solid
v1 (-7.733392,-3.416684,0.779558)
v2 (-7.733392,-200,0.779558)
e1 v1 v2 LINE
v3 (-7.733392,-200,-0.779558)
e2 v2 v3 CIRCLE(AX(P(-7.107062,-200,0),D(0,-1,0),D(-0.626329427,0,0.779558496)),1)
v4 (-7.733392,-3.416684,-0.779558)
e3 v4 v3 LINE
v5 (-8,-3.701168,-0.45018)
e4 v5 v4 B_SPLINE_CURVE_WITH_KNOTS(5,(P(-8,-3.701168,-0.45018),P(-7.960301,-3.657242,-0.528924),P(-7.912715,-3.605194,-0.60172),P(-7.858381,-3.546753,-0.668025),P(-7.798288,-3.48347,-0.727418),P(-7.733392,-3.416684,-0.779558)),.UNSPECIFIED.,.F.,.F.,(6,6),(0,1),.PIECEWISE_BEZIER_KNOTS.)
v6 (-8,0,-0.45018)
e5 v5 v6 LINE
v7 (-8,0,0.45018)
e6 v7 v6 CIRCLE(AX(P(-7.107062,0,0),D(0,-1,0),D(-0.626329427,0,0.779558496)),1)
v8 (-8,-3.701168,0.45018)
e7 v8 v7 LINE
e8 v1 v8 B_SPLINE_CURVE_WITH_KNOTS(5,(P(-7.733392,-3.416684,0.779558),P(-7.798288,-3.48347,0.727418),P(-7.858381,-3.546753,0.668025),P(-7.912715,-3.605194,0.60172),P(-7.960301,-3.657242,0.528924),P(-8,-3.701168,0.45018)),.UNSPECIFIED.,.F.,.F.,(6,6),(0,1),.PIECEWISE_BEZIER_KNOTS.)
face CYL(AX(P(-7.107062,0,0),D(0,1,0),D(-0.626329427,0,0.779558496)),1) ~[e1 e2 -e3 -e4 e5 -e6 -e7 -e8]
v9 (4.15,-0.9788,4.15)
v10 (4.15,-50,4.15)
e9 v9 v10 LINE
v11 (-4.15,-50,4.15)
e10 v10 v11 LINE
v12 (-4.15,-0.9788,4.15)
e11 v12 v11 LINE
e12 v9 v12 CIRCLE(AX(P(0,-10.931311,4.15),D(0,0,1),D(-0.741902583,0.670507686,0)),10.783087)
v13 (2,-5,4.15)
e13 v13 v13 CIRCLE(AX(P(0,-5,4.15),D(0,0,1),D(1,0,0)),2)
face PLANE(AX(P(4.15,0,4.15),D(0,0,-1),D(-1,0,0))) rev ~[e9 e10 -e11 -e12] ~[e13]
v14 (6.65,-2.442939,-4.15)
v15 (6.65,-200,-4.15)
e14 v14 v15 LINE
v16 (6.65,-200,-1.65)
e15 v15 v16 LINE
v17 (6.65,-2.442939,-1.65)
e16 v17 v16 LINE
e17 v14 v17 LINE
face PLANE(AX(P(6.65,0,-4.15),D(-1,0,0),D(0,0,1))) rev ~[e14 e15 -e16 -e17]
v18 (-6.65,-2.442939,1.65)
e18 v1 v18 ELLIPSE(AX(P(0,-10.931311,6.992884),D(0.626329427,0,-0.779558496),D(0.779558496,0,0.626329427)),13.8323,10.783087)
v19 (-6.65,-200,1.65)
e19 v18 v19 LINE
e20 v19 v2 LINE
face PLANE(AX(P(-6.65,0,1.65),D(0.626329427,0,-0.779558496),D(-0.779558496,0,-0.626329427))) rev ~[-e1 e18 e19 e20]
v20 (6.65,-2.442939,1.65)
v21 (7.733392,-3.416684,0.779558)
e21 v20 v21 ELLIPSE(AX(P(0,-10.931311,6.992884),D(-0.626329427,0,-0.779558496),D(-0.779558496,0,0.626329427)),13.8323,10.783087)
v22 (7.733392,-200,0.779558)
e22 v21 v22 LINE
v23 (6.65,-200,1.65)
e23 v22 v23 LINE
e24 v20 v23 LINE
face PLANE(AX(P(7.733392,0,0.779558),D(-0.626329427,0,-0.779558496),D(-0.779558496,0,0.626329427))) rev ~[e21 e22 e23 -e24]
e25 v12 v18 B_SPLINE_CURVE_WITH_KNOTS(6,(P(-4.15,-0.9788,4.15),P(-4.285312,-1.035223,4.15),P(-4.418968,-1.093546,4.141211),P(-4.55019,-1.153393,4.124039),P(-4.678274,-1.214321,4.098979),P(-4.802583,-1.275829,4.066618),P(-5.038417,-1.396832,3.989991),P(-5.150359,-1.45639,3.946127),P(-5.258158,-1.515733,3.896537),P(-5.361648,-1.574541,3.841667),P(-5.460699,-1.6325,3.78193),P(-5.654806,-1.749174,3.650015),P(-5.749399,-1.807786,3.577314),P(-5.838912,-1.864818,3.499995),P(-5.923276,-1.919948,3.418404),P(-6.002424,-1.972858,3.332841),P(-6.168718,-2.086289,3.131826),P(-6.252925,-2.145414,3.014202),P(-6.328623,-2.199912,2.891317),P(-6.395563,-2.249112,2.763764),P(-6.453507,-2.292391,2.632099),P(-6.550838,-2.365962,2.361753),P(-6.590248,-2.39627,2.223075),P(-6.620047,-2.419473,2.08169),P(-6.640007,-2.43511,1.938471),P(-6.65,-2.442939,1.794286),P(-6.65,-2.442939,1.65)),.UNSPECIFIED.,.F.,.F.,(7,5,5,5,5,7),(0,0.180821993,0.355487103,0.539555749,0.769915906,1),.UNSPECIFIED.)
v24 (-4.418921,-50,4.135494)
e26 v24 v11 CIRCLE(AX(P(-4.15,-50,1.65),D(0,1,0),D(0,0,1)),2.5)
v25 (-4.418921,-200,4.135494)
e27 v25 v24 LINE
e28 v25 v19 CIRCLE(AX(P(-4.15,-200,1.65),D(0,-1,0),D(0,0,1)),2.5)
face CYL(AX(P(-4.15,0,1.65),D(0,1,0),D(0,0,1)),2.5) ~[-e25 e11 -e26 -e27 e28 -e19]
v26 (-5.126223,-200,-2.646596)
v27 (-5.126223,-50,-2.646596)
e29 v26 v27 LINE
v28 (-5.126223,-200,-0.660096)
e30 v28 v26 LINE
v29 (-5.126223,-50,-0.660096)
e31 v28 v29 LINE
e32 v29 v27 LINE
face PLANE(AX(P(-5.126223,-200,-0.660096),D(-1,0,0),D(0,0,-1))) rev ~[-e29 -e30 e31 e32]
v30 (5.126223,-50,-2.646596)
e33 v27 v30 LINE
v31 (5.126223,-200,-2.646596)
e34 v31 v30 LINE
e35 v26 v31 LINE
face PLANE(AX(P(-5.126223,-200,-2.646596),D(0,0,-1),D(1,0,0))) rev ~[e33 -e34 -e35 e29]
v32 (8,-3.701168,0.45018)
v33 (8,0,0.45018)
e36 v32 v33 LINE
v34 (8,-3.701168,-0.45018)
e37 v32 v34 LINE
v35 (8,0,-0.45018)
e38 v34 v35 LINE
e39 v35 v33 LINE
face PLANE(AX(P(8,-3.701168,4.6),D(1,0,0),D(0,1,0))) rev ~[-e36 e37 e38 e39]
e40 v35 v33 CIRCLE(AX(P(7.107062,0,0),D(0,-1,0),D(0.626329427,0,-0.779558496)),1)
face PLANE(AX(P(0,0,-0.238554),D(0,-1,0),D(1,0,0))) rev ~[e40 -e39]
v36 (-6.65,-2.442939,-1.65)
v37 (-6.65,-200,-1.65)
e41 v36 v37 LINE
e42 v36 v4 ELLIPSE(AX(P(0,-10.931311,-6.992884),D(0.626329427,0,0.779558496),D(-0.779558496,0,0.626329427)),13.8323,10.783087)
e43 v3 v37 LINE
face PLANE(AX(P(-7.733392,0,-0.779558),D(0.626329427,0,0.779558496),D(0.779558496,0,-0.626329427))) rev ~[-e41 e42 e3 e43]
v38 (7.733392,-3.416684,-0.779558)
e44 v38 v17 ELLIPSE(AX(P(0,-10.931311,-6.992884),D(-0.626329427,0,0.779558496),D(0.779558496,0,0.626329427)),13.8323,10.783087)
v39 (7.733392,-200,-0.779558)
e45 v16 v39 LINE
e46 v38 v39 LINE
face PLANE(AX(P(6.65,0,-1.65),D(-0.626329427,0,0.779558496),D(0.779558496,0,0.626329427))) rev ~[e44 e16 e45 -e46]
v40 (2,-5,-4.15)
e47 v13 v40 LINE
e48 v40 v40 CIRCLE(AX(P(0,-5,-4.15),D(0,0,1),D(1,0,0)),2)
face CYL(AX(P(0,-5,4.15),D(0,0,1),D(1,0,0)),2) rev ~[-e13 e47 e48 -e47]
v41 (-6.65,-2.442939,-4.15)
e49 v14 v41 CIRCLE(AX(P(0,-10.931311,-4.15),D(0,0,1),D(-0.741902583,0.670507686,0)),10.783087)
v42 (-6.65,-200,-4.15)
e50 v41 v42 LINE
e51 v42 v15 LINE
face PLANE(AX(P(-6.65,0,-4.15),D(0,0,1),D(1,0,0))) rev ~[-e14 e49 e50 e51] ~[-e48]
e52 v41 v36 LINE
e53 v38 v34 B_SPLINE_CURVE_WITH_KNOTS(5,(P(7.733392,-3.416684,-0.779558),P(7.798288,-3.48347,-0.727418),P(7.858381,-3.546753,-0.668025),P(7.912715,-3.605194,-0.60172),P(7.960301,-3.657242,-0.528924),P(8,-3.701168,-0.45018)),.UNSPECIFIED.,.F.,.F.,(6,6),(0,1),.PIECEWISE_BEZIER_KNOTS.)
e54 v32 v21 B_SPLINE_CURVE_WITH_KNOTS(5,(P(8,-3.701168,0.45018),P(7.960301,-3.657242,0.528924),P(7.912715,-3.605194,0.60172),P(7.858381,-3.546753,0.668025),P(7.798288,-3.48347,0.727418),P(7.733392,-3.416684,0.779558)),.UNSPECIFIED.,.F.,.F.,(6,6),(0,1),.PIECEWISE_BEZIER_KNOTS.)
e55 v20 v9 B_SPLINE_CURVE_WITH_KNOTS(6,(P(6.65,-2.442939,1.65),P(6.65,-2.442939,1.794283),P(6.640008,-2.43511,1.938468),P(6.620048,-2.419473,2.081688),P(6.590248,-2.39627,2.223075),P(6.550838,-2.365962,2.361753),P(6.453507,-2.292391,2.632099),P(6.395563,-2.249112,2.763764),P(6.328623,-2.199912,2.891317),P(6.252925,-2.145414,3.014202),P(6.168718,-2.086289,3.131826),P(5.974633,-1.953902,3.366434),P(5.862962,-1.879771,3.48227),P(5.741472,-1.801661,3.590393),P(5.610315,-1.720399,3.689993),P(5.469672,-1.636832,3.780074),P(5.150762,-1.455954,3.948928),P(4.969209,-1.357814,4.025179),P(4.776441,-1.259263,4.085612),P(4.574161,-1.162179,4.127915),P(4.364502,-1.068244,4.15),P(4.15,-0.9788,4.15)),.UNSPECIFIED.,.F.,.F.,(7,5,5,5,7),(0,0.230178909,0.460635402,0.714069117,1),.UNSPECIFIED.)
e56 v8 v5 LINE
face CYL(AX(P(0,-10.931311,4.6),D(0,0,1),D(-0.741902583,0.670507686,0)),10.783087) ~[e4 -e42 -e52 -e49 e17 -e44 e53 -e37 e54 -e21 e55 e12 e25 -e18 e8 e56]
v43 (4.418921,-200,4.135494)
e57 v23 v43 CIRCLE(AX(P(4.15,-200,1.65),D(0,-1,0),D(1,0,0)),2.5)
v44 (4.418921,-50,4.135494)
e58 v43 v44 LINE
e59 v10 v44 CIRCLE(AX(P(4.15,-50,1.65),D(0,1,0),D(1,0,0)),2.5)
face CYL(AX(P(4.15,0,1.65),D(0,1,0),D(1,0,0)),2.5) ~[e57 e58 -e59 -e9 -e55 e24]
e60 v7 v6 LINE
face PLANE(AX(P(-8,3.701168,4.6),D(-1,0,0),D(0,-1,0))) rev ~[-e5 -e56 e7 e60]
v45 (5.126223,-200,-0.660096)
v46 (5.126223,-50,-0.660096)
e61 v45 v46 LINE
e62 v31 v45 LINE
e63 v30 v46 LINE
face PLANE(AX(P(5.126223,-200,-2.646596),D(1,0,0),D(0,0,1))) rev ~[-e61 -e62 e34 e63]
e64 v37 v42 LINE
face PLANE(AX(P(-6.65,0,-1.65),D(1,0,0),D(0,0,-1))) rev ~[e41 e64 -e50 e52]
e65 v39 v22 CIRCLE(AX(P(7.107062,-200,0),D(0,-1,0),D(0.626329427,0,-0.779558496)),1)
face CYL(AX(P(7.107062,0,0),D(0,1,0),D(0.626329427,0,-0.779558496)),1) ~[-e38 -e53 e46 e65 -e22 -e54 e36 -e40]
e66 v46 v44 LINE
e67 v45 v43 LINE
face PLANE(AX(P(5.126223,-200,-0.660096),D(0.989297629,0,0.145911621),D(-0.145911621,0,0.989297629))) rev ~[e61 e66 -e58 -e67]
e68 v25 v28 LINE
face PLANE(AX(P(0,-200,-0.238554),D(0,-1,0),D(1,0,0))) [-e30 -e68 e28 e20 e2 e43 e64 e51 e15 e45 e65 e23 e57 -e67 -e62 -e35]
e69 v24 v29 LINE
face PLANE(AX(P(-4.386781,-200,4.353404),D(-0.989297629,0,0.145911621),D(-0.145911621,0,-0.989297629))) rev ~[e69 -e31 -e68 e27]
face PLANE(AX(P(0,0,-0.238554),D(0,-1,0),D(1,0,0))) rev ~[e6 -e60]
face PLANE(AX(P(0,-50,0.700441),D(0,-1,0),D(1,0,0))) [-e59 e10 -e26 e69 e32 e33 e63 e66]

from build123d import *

# Parameters (mm, degrees)
F1_DEPTH = 200
F2_R     = 2
F3_DEPTH = 8.301
F6_DEPTH = 25
F9_DEPTH = 150


# Not quite as in the source:
# - a feature names something its author has since deleted; it is built from what else it names


with BuildPart() as f1:
    # F0 (on Front) → F1 (new body)
    with BuildSketch(Plane.XZ):
        with BuildLine():
            Line((7.7333916469, 0.7795584959), (6.65, 1.65))
            ThreePointArc((6.65, 1.65), (5.917766953, 3.417766953), (4.15, 4.15))
            Line((4.15, 4.15), (-4.15, 4.15))
            ThreePointArc((-4.15, 4.15), (-5.917766953, 3.417766953), (-6.65, 1.65))
            Line((-6.65, 1.65), (-7.7333916469, 0.7795584959))
            ThreePointArc((-7.7333916469, 0.7795584959), (-8.1070622196, 0), (-7.7333916469, -0.7795584959))
            Line((-7.7333916469, -0.7795584959), (-6.65, -1.65))
            Line((-6.65, -1.65), (-6.65, -4.15))
            Line((-6.65, -4.15), (-4.15, -4.15))
            Line((-4.15, -4.15), (4.15, -4.15))
            Line((4.15, -4.15), (6.65, -4.15))
            Line((6.65, -4.15), (6.65, -1.65))
            Line((6.65, -1.65), (7.7333916469, -0.7795584959))
            ThreePointArc((7.7333916469, -0.7795584959), (8.1070622196, 0), (7.7333916469, 0.7795584959))
        make_face()
        with BuildLine():
            ThreePointArc((5.15, -1.65), (4.8571067812, -2.3571067812), (4.15, -2.65))
            Line((4.15, -2.65), (-4.15, -2.65))
            ThreePointArc((-4.15, -2.65), (-4.8571067812, -2.3571067812), (-5.15, -1.65))
            Line((-5.15, -1.65), (-5.15, 1.65))
            ThreePointArc((-5.15, 1.65), (-4.8571067812, 2.3571067812), (-4.15, 2.65))
            Line((-4.15, 2.65), (4.15, 2.65))
            ThreePointArc((4.15, 2.65), (4.8571067812, 2.3571067812), (5.15, 1.65))
            Line((5.15, 1.65), (5.15, -1.65))
        make_face(mode=Mode.SUBTRACT)
        with BuildLine():
            Line((-4.15, -2.65), (4.15, -2.65))
            ThreePointArc((4.15, -2.65), (4.8571067812, -2.3571067812), (5.15, -1.65))
            Line((5.15, -1.65), (5.15, 1.65))
            ThreePointArc((5.15, 1.65), (4.8571067812, 2.3571067812), (4.15, 2.65))
            Line((4.15, 2.65), (-4.15, 2.65))
            ThreePointArc((-4.15, 2.65), (-4.8571067812, 2.3571067812), (-5.15, 1.65))
            Line((-5.15, 1.65), (-5.15, -1.65))
            ThreePointArc((-5.15, -1.65), (-4.8571067812, -2.3571067812), (-4.15, -2.65))
        make_face()
    extrude(amount=F1_DEPTH)

    # F2 (on face) → F3 (cut, through all)
    with BuildSketch(Plane.XY.offset(4.15)):
        with Locations((0, -5)):
            Circle(F2_R)
    extrude(amount=-F3_DEPTH, mode=Mode.SUBTRACT)

    # F5 (on offset) → F6 (cut)
    with BuildSketch(Plane.XY.offset(4.6)):
        with BuildLine():
            Line((8, -3.7011680724), (8, 3.7011680724))
            Line((8, 3.7011680724), (-8, 3.7011680724))
            Line((-8, 3.7011680724), (-8, -3.7011680724))
            ThreePointArc((-8, -3.7011680724), (0, -0.1482238292), (8, -3.7011680724))
        make_face()
    extrude(amount=-F6_DEPTH, mode=Mode.SUBTRACT)

    # F8 (on offset) → F9 (cut)
    with BuildSketch(Plane.XZ.offset(200)):
        Polygon((-5.1262229681, -2.646596171), (0, -2.646596171), (5.1262229681, -2.646596171), (5.1262229681, -0.6600963534), (4.3867812492, 4.353403829), (0, 4.353403829), (-4.3867812492, 4.353403829), (-5.1262229681, -0.6600963534), align=None)
    extrude(amount=-F9_DEPTH, mode=Mode.SUBTRACT)


solid = f1.part
